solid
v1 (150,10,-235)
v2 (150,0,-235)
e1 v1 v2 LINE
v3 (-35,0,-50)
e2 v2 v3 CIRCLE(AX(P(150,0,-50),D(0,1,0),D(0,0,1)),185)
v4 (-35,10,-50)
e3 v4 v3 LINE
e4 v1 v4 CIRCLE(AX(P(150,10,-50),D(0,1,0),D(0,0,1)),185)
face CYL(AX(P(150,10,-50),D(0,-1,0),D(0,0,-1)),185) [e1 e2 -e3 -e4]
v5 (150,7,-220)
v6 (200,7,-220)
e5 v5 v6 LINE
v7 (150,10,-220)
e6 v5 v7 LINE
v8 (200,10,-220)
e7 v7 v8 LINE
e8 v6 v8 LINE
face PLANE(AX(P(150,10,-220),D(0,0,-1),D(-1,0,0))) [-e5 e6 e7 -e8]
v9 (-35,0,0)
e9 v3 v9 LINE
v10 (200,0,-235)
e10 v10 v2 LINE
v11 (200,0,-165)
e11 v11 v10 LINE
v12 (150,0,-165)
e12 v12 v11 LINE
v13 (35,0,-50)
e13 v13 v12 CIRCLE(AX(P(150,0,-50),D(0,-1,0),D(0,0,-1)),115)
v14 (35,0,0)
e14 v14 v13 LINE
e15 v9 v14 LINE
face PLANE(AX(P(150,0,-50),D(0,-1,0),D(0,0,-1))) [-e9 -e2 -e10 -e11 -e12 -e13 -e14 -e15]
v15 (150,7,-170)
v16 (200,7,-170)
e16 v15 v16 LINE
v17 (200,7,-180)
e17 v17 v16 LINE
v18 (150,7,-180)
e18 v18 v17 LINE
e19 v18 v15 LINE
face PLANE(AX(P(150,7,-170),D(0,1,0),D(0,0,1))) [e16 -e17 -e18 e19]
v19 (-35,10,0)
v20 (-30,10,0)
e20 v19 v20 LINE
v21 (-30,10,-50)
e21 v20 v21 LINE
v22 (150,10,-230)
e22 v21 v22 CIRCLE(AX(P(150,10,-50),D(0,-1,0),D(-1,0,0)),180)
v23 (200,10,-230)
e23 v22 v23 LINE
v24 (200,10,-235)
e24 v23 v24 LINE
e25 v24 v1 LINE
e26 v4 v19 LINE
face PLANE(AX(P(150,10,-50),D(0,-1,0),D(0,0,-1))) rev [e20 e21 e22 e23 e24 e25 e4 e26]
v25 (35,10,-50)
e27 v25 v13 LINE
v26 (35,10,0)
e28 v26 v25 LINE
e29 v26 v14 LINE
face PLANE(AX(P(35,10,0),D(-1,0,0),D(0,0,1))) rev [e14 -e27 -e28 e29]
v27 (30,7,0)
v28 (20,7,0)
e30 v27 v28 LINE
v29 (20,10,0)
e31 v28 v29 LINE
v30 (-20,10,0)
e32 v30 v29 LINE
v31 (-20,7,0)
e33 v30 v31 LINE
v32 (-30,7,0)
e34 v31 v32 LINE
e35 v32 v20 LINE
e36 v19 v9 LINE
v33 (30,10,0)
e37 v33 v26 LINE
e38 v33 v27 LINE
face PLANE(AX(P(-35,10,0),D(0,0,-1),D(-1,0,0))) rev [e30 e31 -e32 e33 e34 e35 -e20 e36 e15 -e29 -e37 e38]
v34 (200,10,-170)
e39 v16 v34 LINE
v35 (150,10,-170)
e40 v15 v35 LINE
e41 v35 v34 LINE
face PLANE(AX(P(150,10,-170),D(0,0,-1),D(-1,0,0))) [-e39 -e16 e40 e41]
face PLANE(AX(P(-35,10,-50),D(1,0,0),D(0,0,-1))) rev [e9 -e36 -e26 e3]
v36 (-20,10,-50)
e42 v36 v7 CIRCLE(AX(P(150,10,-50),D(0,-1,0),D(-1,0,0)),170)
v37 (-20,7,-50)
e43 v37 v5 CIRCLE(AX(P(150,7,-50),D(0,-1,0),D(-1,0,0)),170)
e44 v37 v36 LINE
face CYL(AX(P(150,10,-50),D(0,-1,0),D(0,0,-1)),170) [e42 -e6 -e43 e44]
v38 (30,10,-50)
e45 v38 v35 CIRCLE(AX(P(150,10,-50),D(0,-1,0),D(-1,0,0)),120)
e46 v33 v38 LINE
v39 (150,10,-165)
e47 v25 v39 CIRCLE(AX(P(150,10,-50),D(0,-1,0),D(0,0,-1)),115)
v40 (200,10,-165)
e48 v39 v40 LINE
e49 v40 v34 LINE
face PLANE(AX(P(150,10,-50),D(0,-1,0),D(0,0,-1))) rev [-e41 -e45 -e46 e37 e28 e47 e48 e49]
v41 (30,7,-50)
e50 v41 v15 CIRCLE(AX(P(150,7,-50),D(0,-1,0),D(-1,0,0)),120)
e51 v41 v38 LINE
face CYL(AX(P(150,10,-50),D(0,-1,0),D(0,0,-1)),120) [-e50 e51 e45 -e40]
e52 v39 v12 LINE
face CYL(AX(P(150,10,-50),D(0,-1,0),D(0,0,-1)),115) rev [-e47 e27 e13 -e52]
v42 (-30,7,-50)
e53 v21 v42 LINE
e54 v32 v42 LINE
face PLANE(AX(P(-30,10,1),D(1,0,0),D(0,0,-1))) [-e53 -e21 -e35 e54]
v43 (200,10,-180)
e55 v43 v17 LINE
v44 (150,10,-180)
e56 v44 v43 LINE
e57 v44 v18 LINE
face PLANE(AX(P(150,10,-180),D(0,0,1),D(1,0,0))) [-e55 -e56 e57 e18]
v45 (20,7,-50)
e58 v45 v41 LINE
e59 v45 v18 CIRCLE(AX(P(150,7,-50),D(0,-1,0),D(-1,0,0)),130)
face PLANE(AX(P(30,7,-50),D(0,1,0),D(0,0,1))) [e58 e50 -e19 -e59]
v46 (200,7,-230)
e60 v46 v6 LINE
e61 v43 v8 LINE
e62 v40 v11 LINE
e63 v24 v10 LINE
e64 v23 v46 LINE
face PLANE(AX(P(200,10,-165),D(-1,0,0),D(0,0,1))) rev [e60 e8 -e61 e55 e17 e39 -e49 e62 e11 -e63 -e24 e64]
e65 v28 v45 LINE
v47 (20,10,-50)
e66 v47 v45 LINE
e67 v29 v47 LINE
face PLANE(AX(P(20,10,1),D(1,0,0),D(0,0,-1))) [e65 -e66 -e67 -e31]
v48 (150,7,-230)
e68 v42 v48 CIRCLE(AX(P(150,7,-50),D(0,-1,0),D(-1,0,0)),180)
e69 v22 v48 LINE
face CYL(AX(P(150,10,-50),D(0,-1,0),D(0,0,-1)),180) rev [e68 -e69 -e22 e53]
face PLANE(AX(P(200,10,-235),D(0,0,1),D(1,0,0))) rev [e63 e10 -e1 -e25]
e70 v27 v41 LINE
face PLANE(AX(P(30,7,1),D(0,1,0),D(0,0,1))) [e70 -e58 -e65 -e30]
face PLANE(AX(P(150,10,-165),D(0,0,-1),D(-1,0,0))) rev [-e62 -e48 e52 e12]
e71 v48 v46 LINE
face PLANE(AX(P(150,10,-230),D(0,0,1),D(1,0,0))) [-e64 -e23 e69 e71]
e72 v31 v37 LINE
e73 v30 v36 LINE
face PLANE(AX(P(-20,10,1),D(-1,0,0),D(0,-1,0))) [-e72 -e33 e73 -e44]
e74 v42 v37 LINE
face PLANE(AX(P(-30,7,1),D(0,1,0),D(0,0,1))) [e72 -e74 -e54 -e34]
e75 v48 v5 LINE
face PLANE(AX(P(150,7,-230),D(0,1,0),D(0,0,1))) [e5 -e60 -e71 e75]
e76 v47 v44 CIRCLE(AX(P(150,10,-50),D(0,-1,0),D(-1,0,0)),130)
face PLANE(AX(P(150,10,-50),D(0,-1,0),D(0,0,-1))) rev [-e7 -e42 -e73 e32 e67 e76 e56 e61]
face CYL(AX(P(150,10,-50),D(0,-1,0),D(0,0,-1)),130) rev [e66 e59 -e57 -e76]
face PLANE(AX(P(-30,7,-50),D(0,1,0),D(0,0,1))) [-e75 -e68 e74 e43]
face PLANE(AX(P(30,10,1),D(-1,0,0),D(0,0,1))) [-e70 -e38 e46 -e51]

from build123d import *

# Parameters (mm, degrees)
BOSS_EXTRUDE1_DEPTH = 10
CUT_SWEEP1_START    = 7
CUT_SWEEP1_DEPTH    = 3


# Read off the part's stored shape, not the designer's step: Cut-Sweep1
with BuildPart() as part:
    # Sketch1 → Boss-Extrude1 (new body)
    with BuildSketch(Plane(origin=(0, 0, 0), x_dir=(1, 0, 0), z_dir=(0, 1, 0))):
        with BuildLine():
            Line((-35, 0), (35, 0))
            Line((35, 0), (35, 50))
            ThreePointArc((35, 50), (68.682720164, 131.317279836), (150, 165))
            Line((150, 165), (200, 165))
            Line((200, 165), (200, 235))
            Line((200, 235), (150, 235))
            ThreePointArc((150, 235), (19.18524548, 180.81475452), (-35, 50))
            Line((-35, 50), (-35, 0))
        make_face()
    extrude(amount=BOSS_EXTRUDE1_DEPTH)

    # Cut-Sweep1 outline → Cut-Sweep1 (cut)
    with BuildSketch(Plane(origin=(0, 0, 0), x_dir=(1, 0, 0), z_dir=(0, 1, 0)).offset(CUT_SWEEP1_START)):
        with BuildLine():
            Line((-30, 50), (-30, 0))
            Line((-30, 0), (-20, 0))
            Line((-20, 0), (-20, 50))
            ThreePointArc((-20, 50), (29.791847198, 170.208152802), (150, 220))
            Line((150, 220), (200, 220))
            Line((200, 220), (200, 230))
            Line((200, 230), (150, 230))
            ThreePointArc((150, 230), (22.720779386, 177.279220614), (-30, 50))
        make_face()
        with BuildLine():
            Line((20, 50), (20, 0))
            Line((20, 0), (30, 0))
            Line((30, 0), (30, 50))
            ThreePointArc((30, 50), (65.147186258, 134.852813742), (150, 170))
            Line((150, 170), (200, 170))
            Line((200, 170), (200, 180))
            Line((200, 180), (150, 180))
            ThreePointArc((150, 180), (58.076118446, 141.923881554), (20, 50))
        make_face()
    extrude(amount=CUT_SWEEP1_DEPTH, mode=Mode.SUBTRACT)


solid = part.part
